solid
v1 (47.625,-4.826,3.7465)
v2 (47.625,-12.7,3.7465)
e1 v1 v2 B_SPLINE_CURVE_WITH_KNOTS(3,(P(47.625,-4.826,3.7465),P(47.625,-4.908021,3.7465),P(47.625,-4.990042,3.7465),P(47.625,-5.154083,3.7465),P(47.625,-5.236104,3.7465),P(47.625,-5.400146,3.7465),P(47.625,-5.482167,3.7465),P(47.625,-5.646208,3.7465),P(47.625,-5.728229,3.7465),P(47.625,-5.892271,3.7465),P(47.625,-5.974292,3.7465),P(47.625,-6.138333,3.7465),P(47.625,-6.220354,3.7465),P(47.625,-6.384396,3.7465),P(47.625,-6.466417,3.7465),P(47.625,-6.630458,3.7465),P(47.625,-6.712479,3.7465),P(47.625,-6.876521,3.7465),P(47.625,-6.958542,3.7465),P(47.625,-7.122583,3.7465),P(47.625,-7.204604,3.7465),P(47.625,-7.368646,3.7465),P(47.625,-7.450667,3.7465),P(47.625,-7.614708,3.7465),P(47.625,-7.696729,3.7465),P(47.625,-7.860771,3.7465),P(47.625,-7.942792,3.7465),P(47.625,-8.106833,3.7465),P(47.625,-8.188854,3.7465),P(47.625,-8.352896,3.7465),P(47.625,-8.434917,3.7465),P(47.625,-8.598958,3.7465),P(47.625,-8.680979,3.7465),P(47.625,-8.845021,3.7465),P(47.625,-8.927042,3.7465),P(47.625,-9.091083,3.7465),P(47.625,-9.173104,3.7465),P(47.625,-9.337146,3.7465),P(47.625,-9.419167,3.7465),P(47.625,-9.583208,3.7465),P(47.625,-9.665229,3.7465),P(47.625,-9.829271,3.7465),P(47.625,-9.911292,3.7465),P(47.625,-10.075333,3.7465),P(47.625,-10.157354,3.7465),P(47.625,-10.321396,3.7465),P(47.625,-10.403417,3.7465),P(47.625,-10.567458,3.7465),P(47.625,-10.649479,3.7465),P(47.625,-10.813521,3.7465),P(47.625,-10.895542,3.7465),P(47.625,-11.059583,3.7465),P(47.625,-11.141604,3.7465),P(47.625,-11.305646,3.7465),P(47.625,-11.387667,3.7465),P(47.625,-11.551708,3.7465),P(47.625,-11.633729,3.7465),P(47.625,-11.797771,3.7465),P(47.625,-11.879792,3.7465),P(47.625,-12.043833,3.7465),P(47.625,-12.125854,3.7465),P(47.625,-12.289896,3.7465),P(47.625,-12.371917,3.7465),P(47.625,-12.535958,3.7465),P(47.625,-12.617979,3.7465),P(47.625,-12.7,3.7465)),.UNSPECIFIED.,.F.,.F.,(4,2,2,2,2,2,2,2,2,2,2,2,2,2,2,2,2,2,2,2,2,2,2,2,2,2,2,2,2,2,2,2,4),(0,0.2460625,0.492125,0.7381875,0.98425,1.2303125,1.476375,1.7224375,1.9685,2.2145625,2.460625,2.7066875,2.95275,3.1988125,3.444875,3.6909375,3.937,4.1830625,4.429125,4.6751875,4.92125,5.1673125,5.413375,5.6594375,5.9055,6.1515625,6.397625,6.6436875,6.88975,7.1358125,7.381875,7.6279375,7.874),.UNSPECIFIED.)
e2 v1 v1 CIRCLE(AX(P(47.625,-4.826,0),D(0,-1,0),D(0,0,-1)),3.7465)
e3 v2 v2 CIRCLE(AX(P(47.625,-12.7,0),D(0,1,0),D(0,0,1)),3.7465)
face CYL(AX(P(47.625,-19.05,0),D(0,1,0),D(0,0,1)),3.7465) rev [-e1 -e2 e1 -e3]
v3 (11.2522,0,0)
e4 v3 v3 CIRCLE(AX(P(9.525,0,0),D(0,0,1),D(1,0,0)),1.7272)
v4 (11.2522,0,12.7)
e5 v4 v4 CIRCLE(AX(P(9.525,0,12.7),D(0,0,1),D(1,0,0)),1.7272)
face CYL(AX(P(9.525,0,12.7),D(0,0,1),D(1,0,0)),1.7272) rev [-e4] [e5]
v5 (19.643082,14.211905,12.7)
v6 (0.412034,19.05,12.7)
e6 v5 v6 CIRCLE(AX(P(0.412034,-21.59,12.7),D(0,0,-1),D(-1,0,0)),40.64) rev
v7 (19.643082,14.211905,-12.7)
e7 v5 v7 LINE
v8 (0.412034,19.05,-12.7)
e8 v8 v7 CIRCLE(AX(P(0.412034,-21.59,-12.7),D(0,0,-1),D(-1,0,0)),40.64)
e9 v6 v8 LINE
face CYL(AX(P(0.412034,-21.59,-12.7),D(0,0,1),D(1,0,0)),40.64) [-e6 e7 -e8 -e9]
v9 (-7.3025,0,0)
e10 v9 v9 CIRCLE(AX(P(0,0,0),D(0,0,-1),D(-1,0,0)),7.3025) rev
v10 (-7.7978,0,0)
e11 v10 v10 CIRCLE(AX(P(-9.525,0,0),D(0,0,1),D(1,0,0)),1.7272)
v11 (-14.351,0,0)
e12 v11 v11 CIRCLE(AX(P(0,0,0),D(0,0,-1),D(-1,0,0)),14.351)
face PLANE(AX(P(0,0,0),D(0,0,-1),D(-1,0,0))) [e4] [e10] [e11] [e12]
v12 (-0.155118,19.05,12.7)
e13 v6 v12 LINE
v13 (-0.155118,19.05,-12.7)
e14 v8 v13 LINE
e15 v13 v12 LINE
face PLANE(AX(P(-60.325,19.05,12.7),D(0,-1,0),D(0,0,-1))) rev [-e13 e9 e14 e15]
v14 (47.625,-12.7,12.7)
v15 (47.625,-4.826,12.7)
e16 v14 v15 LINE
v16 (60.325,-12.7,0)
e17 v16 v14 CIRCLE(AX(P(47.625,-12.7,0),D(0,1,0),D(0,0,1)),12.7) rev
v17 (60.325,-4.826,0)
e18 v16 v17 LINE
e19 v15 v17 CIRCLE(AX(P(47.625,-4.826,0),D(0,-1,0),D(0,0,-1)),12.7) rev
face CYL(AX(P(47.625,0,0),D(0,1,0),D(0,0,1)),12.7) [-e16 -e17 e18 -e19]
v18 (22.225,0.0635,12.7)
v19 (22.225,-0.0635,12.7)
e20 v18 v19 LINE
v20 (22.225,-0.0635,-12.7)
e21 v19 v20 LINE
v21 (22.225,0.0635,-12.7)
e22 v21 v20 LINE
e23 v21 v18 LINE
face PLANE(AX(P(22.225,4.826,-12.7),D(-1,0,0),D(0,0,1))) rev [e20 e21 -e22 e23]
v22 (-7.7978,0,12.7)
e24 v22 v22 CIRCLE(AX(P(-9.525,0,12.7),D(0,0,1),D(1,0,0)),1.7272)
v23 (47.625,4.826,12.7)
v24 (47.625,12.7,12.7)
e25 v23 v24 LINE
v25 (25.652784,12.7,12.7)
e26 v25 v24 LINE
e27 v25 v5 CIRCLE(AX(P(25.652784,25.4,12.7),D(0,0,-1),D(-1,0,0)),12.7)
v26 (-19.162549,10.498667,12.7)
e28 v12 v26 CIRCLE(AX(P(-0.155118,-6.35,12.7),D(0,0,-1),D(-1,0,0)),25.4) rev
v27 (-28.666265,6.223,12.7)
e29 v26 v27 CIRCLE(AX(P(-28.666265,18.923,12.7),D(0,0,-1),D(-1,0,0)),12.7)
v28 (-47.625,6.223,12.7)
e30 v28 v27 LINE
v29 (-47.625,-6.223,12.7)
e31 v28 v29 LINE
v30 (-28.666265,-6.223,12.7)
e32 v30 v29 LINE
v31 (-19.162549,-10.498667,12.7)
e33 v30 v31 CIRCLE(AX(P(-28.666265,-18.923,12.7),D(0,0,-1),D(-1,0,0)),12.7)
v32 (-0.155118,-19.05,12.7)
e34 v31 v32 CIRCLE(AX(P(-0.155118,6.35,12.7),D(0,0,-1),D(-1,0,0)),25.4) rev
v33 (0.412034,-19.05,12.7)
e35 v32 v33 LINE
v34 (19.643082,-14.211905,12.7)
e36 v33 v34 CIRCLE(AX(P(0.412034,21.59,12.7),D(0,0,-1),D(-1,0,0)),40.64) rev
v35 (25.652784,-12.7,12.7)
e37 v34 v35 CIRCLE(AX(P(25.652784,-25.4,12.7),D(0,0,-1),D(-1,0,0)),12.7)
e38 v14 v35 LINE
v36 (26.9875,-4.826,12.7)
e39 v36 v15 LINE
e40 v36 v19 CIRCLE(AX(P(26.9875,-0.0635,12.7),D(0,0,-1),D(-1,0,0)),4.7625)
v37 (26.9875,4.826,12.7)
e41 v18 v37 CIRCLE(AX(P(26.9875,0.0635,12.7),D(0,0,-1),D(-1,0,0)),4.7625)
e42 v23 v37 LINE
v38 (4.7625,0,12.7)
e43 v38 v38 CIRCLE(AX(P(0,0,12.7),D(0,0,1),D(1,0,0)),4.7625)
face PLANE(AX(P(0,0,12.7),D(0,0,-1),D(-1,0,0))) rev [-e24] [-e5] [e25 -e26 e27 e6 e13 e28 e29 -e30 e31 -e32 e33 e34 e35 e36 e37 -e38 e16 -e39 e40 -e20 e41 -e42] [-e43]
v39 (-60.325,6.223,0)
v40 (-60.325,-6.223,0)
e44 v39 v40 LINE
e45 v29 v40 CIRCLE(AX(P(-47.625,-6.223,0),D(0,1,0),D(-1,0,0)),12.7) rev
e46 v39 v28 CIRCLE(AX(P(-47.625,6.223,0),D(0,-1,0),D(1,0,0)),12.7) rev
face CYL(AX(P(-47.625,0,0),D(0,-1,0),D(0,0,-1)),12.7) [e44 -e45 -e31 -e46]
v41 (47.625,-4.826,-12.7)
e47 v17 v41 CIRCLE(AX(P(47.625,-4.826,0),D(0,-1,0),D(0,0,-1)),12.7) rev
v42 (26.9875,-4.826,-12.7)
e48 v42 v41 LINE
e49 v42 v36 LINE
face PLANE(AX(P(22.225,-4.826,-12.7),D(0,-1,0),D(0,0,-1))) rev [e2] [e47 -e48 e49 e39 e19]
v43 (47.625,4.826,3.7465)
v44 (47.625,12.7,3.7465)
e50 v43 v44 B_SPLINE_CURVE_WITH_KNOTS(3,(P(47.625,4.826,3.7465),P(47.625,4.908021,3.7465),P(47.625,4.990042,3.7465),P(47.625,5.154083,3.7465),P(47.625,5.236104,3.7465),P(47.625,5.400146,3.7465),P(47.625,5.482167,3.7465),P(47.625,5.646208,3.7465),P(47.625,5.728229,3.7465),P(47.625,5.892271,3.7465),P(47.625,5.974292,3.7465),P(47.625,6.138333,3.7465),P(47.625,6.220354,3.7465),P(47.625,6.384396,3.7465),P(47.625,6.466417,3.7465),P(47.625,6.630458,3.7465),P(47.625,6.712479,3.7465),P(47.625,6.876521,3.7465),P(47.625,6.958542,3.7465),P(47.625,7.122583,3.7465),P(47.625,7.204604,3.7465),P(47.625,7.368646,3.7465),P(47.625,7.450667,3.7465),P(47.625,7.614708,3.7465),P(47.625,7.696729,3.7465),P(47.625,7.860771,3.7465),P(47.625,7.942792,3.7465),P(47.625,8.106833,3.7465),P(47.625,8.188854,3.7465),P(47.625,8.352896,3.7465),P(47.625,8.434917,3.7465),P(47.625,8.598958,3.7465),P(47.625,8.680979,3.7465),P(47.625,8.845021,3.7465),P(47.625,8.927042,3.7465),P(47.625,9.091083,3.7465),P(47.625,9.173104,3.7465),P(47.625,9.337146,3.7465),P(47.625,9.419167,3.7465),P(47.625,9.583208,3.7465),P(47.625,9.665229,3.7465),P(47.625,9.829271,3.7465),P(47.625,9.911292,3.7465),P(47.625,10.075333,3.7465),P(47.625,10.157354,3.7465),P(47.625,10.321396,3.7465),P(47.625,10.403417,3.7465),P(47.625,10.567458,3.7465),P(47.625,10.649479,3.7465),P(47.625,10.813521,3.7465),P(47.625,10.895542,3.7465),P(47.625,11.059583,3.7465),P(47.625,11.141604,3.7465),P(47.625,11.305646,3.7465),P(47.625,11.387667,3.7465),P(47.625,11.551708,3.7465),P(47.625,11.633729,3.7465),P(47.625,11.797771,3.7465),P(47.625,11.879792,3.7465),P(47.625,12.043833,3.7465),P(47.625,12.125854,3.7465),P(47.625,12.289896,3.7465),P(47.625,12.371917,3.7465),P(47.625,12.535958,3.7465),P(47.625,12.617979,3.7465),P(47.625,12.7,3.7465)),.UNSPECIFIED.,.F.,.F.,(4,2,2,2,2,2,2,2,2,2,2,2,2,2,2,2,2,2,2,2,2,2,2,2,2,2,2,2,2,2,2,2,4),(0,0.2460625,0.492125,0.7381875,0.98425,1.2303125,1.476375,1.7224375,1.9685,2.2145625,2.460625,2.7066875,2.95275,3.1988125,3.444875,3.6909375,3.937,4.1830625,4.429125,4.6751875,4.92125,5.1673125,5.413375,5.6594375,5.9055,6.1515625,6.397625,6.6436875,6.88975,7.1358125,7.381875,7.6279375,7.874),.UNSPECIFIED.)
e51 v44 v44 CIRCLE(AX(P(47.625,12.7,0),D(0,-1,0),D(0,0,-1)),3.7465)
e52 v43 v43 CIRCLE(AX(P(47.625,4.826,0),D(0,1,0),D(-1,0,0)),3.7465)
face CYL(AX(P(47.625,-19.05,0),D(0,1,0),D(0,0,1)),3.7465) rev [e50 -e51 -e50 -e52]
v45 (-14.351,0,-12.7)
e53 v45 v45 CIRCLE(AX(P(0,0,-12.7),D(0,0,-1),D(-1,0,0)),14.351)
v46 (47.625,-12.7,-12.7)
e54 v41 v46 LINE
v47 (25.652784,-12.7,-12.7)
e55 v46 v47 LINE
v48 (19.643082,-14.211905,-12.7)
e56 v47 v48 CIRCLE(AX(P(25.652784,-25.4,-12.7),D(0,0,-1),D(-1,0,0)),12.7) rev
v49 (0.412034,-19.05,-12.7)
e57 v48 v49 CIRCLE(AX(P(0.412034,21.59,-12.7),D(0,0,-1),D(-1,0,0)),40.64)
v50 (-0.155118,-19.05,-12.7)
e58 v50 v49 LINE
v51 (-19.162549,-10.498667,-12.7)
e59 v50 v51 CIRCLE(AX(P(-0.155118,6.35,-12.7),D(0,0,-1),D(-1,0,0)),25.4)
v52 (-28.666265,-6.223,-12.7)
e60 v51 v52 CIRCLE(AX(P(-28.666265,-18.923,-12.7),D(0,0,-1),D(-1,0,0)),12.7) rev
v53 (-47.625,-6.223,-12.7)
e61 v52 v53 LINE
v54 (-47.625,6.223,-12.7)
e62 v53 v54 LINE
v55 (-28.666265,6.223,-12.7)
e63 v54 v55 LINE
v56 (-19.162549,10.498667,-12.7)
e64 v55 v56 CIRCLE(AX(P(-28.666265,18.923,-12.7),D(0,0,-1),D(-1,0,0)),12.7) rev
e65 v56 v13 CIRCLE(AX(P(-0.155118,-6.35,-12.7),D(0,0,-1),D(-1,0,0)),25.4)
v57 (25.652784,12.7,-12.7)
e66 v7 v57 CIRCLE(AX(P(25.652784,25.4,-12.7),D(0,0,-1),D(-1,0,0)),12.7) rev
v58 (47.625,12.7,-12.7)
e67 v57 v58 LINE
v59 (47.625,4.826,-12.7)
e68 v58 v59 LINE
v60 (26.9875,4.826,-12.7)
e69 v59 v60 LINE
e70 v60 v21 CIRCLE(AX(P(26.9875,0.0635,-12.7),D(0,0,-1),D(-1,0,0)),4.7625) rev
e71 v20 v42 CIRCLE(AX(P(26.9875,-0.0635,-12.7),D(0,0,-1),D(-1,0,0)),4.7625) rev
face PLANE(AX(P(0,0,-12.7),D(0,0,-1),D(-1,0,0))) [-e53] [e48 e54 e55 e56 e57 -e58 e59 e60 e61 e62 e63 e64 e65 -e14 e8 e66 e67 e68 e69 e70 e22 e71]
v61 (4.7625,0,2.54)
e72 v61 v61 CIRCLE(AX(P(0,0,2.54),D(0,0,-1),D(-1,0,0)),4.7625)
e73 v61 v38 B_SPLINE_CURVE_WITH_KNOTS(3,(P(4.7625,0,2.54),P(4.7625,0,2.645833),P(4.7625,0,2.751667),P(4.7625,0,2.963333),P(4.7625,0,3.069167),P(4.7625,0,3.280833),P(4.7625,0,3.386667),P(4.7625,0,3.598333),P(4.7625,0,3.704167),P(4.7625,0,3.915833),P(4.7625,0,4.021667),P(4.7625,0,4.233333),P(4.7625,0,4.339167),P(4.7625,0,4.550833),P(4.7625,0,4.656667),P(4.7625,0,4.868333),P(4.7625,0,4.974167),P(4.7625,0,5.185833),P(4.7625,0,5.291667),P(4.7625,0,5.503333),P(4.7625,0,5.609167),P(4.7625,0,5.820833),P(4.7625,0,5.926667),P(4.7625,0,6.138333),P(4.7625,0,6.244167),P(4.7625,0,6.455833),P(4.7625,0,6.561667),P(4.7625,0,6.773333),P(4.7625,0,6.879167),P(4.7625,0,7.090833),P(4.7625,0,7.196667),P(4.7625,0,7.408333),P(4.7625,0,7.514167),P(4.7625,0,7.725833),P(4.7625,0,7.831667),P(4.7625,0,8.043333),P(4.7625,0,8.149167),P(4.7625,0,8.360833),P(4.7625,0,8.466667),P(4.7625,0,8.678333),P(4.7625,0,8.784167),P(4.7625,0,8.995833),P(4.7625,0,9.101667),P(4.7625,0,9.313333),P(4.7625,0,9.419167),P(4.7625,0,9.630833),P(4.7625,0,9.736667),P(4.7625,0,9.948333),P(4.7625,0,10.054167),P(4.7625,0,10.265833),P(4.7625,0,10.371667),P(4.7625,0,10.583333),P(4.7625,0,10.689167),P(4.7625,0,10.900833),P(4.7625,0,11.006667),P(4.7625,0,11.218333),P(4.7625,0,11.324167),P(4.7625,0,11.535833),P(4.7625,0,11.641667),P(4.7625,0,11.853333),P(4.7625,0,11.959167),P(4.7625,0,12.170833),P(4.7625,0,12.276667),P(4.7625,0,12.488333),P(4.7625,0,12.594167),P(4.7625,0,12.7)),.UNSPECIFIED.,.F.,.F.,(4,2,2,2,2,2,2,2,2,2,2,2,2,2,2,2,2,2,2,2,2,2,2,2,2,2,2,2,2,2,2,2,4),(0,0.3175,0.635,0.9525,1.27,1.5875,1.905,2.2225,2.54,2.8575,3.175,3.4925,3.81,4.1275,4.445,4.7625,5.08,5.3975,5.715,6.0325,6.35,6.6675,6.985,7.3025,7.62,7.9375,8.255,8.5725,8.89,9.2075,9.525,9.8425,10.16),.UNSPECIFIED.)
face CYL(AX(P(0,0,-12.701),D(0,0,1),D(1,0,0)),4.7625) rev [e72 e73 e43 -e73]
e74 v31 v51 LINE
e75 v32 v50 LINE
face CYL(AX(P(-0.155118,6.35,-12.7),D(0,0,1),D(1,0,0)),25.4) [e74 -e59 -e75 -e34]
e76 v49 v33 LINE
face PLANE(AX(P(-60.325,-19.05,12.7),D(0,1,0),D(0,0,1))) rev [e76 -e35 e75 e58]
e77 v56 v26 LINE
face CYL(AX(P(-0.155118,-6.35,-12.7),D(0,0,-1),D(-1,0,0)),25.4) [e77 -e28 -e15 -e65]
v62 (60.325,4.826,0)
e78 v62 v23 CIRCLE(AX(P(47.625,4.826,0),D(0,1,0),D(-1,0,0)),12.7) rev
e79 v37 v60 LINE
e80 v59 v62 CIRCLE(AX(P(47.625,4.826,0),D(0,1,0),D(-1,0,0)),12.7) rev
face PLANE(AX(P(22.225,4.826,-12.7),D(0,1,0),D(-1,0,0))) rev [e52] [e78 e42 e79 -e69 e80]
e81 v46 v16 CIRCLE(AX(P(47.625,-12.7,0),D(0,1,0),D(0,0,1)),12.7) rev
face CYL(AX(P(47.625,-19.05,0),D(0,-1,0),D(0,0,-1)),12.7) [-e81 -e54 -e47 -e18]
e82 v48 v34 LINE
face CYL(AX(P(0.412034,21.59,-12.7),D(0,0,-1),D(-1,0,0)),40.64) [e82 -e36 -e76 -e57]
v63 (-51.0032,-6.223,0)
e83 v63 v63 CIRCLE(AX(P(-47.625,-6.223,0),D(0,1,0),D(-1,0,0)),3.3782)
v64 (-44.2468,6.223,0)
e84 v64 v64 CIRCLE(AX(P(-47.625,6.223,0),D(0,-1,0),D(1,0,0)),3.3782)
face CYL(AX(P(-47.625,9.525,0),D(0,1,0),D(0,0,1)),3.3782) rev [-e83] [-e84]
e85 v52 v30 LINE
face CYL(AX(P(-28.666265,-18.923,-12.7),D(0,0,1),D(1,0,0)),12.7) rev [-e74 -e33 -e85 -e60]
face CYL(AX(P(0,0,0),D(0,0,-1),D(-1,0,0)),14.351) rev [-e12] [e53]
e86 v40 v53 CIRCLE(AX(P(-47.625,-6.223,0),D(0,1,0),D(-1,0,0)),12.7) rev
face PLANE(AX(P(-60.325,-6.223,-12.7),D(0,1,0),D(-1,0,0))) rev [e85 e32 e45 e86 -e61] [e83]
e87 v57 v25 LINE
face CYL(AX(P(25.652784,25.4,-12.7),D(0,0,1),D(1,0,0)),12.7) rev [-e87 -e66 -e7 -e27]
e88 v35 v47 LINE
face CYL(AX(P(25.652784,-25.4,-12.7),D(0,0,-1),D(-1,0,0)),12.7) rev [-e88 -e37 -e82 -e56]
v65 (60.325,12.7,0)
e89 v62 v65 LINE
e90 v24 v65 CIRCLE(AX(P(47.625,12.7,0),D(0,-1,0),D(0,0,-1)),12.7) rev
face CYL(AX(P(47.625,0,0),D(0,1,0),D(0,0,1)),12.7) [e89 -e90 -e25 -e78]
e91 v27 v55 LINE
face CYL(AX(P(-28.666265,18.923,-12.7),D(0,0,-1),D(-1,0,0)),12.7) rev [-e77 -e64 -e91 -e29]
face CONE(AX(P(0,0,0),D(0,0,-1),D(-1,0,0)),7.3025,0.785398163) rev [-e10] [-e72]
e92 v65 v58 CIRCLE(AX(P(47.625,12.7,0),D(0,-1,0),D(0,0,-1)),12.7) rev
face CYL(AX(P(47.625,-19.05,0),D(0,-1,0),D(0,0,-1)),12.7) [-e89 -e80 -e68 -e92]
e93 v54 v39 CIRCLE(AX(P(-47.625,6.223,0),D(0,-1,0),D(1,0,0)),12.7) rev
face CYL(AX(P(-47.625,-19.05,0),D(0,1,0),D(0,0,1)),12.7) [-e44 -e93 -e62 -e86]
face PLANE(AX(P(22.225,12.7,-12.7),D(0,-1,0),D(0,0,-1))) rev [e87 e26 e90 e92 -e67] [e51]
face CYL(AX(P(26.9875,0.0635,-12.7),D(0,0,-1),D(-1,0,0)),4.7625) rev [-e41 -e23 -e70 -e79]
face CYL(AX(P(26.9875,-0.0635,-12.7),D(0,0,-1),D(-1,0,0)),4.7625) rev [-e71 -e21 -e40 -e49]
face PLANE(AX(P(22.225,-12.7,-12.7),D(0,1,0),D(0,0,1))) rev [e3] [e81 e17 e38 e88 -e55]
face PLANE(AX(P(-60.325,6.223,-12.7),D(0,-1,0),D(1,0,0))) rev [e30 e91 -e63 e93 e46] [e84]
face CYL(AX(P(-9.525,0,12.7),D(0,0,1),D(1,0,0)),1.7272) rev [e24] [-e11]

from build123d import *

# Parameters (mm, degrees)
SKETCH1_W                   = 120.65
SKETCH1_H                   = 38.1
BOSS_EXTRUDE1_DEPTH         = 12.7
SKETCH2_R                   = 14.351
CUT_EXTRUDE1_DEPTH          = 12.7
F_8_32_TAPPED_HOLE1_D       = 3.4544
F_8_32_TAPPED_HOLE1_DEPTH   = 12.7
F_8_32_TAPPED_HOLE1_TIP     = 1.037806461
CUT_EXTRUDE2_REACH          = 70.17
SKETCH7_R                   = 4.7625
FILLET1_R                   = 12.7
SKETCH12_W                  = 38.1
SKETCH12_H                  = 12.827
SKETCH12_H_2                = 9.652
SKETCH12_H_3                = 6.35
CUT_EXTRUDE6_DEPTH          = 69.170141008
SKETCH13_R                  = 3.7465
CUT_EXTRUDE7_DEPTH          = 73.470722537
F_1_4_CLEARANCE_HOLE1_D     = 6.7564
F_1_4_CLEARANCE_HOLE1_DEPTH = 19.05
F_1_4_CLEARANCE_HOLE1_TIP   = 2.029827343
CHAMFER1_SIZE               = 2.54
FILLET2_R                   = 25.4
FILLET3_R                   = 12.7
FILLET4_R                   = 40.64
FILLET5_R                   = 12.7
FILLET6_R                   = 4.7625


# Some blends are built 0.0001 mm under size
with BuildPart() as part:
    # Sketch1 → Boss-Extrude1 (new, symmetric)
    with BuildSketch(Plane.XY):
        Rectangle(SKETCH1_W, SKETCH1_H)
    extrude(amount=BOSS_EXTRUDE1_DEPTH, both=True)

    # Sketch2 → Cut-Extrude1 (cut)
    with BuildSketch(Plane(origin=(0, 0, -12.7), x_dir=(-1, 0, 0), z_dir=(0, 0, -1))):
        Circle(SKETCH2_R)
    extrude(amount=-CUT_EXTRUDE1_DEPTH, mode=Mode.SUBTRACT)

    # #8-32 Tapped Hole1
    with Locations(Plane.XY.offset(12.7)):
        with Locations((9.525, 0), (-9.525, 0)):
            Hole(F_8_32_TAPPED_HOLE1_D / 2, depth=F_8_32_TAPPED_HOLE1_DEPTH)
            with Locations((0, 0, -(F_8_32_TAPPED_HOLE1_DEPTH + F_8_32_TAPPED_HOLE1_TIP / 2))):  # 118° drill point
                Cone(0, F_8_32_TAPPED_HOLE1_D / 2, F_8_32_TAPPED_HOLE1_TIP, mode=Mode.SUBTRACT)

    # Sketch7 → Cut-Extrude2 (cut, up to next)
    with BuildSketch(Plane.XY.offset(12.7), mode=Mode.PRIVATE) as cut_extrude2_sk1:
        Circle(SKETCH7_R)
    cut_extrude2_tool1 = extrude(cut_extrude2_sk1.sketch, amount=-CUT_EXTRUDE2_REACH, mode=Mode.PRIVATE) & part.part
    add(cut_extrude2_tool1.solids().sort_by_distance((0, 0, 12.7))[0], mode=Mode.SUBTRACT)

    # Fillet1
    fillet1_edges = [part.edges().sort_by_distance(p)[0] for p in [
        (-60.325, 0, 12.7),
        (-60.325, 0, -12.7),
        (60.325, 0, 12.7),
        (60.325, 0, -12.7),
    ]]
    fillet(fillet1_edges, radius=FILLET1_R - 0.0001)  # a hair under: the kernel refuses the full size

    # Sketch12 → Cut-Extrude6 (cut, through all)
    with BuildSketch(Plane.XY.offset(12.7)):
        with Locations((-41.275, 12.6365)):
            Rectangle(SKETCH12_W, SKETCH12_H)
        with Locations((41.275, 0)):
            Rectangle(SKETCH12_W, SKETCH12_H_2)
        with Locations((-41.275, -12.6365)):
            Rectangle(SKETCH12_W, SKETCH12_H)
        with Locations((41.275, 15.875)):
            Rectangle(SKETCH12_W, SKETCH12_H_3)
        with Locations((41.275, -15.875)):
            Rectangle(SKETCH12_W, SKETCH12_H_3)
    extrude(amount=-CUT_EXTRUDE6_DEPTH, mode=Mode.SUBTRACT)

    # Sketch13 → Cut-Extrude7 (cut, through all)
    with BuildSketch(Plane(origin=(0, 19.05, 0), x_dir=(1, 0, 0), z_dir=(0, 1, 0))):
        with Locations(Location((47.625, 0, 0), (0, 0, 270))):
            Circle(SKETCH13_R)
    extrude(amount=-CUT_EXTRUDE7_DEPTH, mode=Mode.SUBTRACT)

    # 1/4 Clearance Hole1
    with Locations(Plane(origin=(0, 9.525, -30.597499938), x_dir=(0, 0, 1), z_dir=(0, 1, 0))):
        with Locations((30.597499938, -47.625), (62.347499938, -47.625), (81.397499938, -47.625), (196.332499938, -47.625)):
            Hole(F_1_4_CLEARANCE_HOLE1_D / 2, depth=F_1_4_CLEARANCE_HOLE1_DEPTH)
            with Locations((0, 0, -(F_1_4_CLEARANCE_HOLE1_DEPTH + F_1_4_CLEARANCE_HOLE1_TIP / 2))):  # 118° drill point
                Cone(0, F_1_4_CLEARANCE_HOLE1_D / 2, F_1_4_CLEARANCE_HOLE1_TIP, mode=Mode.SUBTRACT)

    # Chamfer1
    chamfer1_edges = [part.edges().sort_by_distance(p)[0] for p in [
        (-4.7625, 0, 0),
    ]]
    chamfer(chamfer1_edges, length=CHAMFER1_SIZE)

    # Fillet2
    # the kernel refuses this fillet: 25.4 mm, written as the material it takes off along each edge
    with BuildSketch(Plane(origin=(-22.225, -19.05, 67.874703839), x_dir=(0, 1, 0), z_dir=(0, 0, -1))) as fillet2_piece_1:
        with BuildLine():
            CenterArc((25.4, 22.069881536), FILLET2_R, 180, 60.330249663)
            Line((0, 22.069881536), (-0.508, 22.069881536))
            Line((-0.508, 22.069881536), (-0.508, 0))
            Line((-0.508, 0), (0, -0.508))
            ThreePointArc((0, -0.508), (6.4135, -0.508), (12.57554, -0.441397631))
            Line((12.57554, -0.441397631), (12.827, 0))
        make_face()
    extrude(amount=135.749407679, mode=Mode.SUBTRACT)
    with BuildSketch(Plane(origin=(-22.225, 19.05, 67.874703839), x_dir=(0, -1, 0), z_dir=(0, 0, -1))) as fillet2_piece_2:
        with BuildLine():
            CenterArc((25.4, -22.069881536), FILLET2_R, 119.669750337, 60.330249663)
            Line((0, -22.069881536), (-0.508, -22.069881536))
            Line((-0.508, -22.069881536), (-0.508, 0))
            Line((-0.508, 0), (0, 0.508))
            ThreePointArc((0, 0.508), (6.4135, 0.508), (12.57554, 0.441397631))
            Line((12.57554, 0.441397631), (12.827, 0))
        make_face()
    extrude(amount=135.749407679, mode=Mode.SUBTRACT)

    # Fillet3
    fillet3_edges = [part.edges().sort_by_distance(p)[0] for p in [
        (-22.225, 6.223, 0),
        (-22.225, -6.223, 0),
    ]]
    fillet(fillet3_edges, radius=FILLET3_R)

    # Fillet4
    # the kernel refuses this fillet: 40.64 mm, written as the material it takes off along each edge
    with BuildSketch(Plane(origin=(22.225, -19.05, 67.232415818), x_dir=(-1, 0, 0), z_dir=(0, 0, -1))) as fillet4_piece_1:
        with BuildLine():
            CenterArc((21.812966327, 40.64), FILLET4_R, 237.538255033, 32.461744967)
            Line((0, 6.35), (-0.436259327, 5.6642))
            ThreePointArc((-0.436259327, 5.6642), (-0.8128, 3.175), (-0.8128, 0))
            Line((-0.8128, 0), (0, -0.8128))
            Line((0, -0.8128), (21.812966327, -0.8128))
            Line((21.812966327, -0.8128), (21.812966327, 0))
        make_face()
    extrude(amount=134.464831637, mode=Mode.SUBTRACT)
    with BuildSketch(Plane(origin=(22.225, 19.05, 67.232415818), x_dir=(-1, 0, 0), z_dir=(0, 0, -1))) as fillet4_piece_2:
        with BuildLine():
            CenterArc((21.812966327, -40.64), FILLET4_R, 90, 32.461744967)
            Line((0, -6.35), (-0.436259327, -5.6642))
            ThreePointArc((-0.436259327, -5.6642), (-0.8128, -3.175), (-0.8128, 0))
            Line((-0.8128, 0), (0, 0.8128))
            Line((0, 0.8128), (21.812966327, 0.8128))
            Line((21.812966327, 0.8128), (21.812966327, 0))
        make_face()
    extrude(amount=134.464831637, mode=Mode.SUBTRACT)

    # Fillet5
    fillet5_edges = [part.edges().sort_by_distance(p)[0] for p in [
        (22.225, 12.7, 0),
        (22.225, -12.7, 0),
    ]]
    fillet(fillet5_edges, radius=FILLET5_R)

    # Fillet6
    fillet6_edges = [part.edges().sort_by_distance(p)[0] for p in [
        (22.225, -4.826, 0),
        (22.225, 4.826, 0),
    ]]
    fillet(fillet6_edges, radius=FILLET6_R)


solid = part.part
